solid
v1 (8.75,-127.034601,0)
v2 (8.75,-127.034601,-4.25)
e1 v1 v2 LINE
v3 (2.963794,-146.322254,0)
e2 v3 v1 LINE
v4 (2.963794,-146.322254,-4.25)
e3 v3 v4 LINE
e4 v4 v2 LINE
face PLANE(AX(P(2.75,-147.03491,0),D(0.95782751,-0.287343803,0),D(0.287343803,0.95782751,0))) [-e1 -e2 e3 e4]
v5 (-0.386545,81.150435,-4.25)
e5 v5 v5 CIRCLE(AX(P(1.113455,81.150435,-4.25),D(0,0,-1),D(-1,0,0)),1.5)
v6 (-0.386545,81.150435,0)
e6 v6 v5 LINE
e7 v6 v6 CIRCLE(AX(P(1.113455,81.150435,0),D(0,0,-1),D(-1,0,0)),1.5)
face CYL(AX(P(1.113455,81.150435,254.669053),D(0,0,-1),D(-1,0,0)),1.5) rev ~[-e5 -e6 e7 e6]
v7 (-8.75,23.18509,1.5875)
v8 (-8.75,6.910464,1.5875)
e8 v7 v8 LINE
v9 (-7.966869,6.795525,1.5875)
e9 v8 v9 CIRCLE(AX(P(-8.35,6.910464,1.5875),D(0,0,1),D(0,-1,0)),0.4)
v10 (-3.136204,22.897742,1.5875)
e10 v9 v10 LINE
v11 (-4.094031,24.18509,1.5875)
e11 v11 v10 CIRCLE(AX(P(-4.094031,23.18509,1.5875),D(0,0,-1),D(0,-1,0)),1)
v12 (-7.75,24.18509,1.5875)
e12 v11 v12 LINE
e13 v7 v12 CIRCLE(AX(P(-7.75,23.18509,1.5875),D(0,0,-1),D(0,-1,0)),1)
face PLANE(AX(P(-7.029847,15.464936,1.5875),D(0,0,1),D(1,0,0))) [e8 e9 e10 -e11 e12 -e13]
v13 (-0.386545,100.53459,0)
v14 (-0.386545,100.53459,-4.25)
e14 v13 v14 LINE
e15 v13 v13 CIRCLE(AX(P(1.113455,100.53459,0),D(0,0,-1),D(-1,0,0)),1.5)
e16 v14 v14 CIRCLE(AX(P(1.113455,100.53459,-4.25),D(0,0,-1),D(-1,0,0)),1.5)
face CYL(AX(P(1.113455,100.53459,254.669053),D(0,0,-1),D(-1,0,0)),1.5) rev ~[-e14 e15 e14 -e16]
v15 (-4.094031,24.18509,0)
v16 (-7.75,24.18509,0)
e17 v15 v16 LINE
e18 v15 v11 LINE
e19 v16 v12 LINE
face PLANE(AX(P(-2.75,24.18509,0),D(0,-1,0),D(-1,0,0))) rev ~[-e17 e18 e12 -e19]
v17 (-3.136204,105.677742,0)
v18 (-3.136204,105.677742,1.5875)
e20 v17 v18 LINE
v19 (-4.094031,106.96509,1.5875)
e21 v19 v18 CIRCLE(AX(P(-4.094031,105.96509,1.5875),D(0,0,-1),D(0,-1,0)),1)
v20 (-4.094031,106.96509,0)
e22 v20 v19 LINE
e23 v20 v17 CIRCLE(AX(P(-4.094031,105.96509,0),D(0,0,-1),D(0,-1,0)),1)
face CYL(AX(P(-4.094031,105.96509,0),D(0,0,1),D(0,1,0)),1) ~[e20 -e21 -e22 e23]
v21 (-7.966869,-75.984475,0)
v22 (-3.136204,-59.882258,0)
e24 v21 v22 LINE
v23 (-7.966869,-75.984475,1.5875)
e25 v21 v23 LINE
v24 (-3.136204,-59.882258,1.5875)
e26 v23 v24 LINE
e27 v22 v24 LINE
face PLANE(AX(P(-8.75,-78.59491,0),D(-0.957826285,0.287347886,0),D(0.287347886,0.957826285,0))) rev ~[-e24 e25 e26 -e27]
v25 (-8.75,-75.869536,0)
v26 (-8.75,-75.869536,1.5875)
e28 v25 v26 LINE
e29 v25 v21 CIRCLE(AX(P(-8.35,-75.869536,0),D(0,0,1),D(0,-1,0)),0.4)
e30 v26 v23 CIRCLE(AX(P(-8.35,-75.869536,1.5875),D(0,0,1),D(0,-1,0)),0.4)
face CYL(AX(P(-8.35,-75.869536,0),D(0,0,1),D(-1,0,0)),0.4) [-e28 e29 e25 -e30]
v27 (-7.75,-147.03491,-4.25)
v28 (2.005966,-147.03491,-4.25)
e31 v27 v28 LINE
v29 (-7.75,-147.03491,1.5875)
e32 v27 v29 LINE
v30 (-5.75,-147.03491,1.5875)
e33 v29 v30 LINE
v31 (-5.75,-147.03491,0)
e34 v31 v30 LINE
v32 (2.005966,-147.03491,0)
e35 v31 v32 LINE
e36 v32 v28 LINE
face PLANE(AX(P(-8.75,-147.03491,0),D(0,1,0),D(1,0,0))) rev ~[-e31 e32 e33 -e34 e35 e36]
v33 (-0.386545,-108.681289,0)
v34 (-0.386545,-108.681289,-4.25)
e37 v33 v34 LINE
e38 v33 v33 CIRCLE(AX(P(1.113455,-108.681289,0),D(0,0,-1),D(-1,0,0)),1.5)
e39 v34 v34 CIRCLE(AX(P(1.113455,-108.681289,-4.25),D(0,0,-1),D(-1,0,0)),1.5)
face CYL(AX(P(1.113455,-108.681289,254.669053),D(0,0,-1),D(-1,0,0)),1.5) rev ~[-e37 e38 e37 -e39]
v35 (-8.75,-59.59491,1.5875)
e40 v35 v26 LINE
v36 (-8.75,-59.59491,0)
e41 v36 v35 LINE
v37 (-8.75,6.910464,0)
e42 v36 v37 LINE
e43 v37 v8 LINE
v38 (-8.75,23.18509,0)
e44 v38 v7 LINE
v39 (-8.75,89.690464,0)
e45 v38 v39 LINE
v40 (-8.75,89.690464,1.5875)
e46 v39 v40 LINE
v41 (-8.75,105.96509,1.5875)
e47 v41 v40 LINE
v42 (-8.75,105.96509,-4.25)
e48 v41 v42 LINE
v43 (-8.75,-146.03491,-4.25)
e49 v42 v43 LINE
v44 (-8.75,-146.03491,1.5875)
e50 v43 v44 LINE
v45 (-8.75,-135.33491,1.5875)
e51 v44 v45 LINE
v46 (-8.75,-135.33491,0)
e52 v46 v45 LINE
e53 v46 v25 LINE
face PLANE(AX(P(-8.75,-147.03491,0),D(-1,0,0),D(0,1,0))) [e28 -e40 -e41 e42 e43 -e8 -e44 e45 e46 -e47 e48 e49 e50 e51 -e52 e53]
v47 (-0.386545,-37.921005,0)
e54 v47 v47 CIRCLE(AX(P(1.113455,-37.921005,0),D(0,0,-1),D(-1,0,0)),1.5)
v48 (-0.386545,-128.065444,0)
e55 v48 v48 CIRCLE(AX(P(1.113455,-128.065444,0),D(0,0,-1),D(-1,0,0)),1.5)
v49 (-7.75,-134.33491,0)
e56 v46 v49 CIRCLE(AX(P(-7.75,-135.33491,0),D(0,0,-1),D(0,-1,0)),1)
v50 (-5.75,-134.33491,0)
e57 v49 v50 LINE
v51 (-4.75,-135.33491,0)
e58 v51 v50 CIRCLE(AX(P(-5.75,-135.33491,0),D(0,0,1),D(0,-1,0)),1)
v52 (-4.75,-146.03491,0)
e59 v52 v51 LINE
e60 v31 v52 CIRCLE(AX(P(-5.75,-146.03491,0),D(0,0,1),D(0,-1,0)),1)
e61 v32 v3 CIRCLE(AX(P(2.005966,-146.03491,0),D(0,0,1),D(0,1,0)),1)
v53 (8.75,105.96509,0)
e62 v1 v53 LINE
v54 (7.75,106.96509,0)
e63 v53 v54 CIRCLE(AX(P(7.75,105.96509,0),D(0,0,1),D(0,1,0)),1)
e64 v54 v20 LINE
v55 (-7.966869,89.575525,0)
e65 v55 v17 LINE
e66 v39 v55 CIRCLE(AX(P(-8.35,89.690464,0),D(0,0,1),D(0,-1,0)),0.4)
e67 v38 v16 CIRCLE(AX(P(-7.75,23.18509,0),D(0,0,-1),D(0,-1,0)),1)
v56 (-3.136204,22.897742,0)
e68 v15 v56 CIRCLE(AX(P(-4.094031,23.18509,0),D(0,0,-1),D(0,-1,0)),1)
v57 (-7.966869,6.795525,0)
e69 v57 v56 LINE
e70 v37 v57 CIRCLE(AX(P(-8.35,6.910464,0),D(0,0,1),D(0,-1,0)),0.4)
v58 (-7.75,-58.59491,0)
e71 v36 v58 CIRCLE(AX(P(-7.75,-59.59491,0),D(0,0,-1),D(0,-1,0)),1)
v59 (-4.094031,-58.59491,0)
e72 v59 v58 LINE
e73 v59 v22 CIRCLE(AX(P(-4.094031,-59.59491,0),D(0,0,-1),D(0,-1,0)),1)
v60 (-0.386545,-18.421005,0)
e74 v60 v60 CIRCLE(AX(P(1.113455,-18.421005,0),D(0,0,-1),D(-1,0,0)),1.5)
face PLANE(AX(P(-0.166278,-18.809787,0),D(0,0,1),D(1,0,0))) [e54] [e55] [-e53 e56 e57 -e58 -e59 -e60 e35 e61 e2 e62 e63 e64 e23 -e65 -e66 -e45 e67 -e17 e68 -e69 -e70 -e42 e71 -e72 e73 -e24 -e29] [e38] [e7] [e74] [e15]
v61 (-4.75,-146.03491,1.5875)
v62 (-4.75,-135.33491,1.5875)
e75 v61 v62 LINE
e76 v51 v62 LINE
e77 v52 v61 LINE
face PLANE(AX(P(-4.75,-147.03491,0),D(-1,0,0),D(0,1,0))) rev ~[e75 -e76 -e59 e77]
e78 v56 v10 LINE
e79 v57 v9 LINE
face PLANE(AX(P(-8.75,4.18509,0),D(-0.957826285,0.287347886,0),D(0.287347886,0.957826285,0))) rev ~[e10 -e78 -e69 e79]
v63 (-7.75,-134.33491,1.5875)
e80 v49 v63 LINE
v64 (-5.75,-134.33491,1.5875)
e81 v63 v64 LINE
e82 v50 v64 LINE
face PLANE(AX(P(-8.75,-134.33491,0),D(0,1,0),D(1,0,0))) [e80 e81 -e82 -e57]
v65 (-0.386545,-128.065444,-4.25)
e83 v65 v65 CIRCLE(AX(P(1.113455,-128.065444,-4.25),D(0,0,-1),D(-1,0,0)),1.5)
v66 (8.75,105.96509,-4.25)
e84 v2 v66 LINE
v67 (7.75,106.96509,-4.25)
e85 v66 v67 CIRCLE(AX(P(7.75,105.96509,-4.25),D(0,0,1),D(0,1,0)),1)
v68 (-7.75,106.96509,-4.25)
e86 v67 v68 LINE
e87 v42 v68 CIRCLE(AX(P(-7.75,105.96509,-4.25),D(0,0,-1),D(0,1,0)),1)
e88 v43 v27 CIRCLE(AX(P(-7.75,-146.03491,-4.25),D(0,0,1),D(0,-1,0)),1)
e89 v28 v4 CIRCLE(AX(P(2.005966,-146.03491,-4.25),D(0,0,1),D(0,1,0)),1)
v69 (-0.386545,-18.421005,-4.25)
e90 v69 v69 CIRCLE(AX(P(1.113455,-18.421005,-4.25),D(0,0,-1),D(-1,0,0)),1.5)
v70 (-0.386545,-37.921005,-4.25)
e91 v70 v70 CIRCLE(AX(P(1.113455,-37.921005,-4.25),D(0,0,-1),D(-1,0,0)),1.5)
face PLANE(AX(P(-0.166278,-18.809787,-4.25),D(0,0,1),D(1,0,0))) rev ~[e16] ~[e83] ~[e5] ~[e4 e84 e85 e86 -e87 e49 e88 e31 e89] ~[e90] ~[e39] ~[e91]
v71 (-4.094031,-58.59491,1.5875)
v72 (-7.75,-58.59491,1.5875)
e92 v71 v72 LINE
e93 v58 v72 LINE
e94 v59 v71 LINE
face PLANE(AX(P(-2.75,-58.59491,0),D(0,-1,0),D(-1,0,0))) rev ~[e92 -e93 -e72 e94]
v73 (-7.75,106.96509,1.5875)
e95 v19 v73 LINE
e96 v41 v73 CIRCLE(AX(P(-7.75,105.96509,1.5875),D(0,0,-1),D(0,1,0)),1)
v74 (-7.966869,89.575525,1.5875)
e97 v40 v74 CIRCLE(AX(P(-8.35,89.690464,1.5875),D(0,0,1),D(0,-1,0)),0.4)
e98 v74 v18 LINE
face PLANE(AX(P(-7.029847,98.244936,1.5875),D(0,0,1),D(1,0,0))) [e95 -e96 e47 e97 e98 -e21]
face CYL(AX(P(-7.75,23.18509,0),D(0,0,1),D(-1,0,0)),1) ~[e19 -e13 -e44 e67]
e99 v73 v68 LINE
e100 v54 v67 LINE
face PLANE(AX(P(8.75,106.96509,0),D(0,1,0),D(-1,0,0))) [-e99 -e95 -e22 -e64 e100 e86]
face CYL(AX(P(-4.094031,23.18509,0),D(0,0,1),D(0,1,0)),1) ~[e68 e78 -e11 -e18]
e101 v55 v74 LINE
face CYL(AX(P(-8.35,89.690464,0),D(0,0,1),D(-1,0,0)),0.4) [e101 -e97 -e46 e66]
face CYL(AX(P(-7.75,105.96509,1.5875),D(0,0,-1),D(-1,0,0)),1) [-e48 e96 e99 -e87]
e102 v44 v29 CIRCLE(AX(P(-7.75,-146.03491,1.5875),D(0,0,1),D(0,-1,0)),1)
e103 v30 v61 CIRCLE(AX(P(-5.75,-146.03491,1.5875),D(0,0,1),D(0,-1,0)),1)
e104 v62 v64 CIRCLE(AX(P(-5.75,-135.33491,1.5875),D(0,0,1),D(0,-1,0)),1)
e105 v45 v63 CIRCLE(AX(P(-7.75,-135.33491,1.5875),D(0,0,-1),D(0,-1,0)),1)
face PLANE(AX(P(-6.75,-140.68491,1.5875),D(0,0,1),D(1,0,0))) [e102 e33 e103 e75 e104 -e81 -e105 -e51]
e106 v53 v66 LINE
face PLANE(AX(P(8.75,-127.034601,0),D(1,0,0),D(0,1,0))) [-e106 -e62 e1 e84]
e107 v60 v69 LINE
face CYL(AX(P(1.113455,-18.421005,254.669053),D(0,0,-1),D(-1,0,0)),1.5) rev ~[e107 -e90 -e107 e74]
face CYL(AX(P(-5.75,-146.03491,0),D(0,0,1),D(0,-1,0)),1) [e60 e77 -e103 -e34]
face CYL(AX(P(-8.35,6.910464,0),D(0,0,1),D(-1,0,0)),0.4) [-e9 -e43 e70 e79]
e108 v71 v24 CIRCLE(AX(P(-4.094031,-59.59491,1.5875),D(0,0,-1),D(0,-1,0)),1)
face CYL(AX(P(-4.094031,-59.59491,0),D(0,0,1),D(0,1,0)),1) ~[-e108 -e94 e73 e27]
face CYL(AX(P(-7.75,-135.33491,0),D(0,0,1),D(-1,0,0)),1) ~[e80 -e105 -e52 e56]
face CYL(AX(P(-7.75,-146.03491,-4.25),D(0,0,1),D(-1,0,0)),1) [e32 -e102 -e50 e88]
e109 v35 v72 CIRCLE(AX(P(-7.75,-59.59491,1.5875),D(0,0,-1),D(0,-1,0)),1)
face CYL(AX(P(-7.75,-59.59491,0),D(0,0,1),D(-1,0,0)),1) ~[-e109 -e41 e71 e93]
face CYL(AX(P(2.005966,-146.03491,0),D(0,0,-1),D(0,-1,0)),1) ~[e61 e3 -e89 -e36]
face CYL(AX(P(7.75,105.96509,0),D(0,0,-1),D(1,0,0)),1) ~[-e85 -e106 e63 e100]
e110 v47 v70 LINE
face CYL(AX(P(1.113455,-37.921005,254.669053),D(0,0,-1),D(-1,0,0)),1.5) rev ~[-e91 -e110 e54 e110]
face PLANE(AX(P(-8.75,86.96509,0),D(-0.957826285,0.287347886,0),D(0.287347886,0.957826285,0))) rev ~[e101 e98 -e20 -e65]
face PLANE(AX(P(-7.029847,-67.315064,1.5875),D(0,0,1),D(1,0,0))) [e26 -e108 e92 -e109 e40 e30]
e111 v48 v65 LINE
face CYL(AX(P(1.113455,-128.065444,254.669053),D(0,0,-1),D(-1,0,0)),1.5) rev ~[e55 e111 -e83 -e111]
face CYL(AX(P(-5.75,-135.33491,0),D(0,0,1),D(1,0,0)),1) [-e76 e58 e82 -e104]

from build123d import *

# Parameters (mm, degrees)
F1_DEPTH = 4.25
F2_W     = 4
F2_H     = 12.7
F3_DEPTH = 1.5875
F4_R     = 1
F5_F1_R  = 0.4
F5_F2_R  = 0.4
F5_F3_R  = 0.4
F7_D     = 3


with BuildPart() as f1:
    # F0 (on Top) → F1 (new body)
    with BuildSketch(Plane.XY):
        Polygon((8.75, 106.9650896668), (-8.75, 106.9650896668), (-8.75, -147.0349103332), (2.75, -147.0349103332), (8.75, -127.0346005735), align=None)
    extrude(amount=-F1_DEPTH)

    # F2 (on face) → F3 (join)
    with BuildSketch(Plane.XY):
        Polygon((-2.75, 24.1850896668), (-8.75, 24.1850896668), (-8.75, 4.1850896668), align=None)
        Polygon((-2.75, -58.5949103332), (-8.75, -58.5949103332), (-8.75, -78.5949103332), align=None)
        with Locations((-6.75, -140.6849103332)):
            Rectangle(F2_W, F2_H)
        Polygon((-2.75, 106.9650896668), (-8.75, 106.9650896668), (-8.75, 86.9650896668), align=None)
    extrude(amount=F3_DEPTH)

    # F4
    f4_edges = [f1.edges().sort_by_distance(p)[0] for p in [
        (-2.75, -58.59491, 0.79375),
        (-8.75, -58.59491, 0.79375),
        (-2.75, 24.18509, 0.79375),
        (-8.75, 24.18509, 0.79375),
        (-2.75, 106.96509, 0.79375),
        (-8.75, 106.96509, -1.33125),
        (8.75, 106.96509, -2.125),
        (-8.75, -147.03491, -1.33125),
        (-4.75, -147.03491, 0.79375),
        (-4.75, -134.33491, 0.79375),
        (-8.75, -134.33491, 0.79375),
        (2.75, -147.03491, -2.125),
    ]]
    fillet(f4_edges, radius=F4_R)

    # F5: fillet of radius 0.4 on 3 edges, made by hand

    # F5_f1
    f5_f1_edges = [f1.edges().sort_by_distance(p)[0] for p in [
        (-8.75, 86.9650896668, 0.79375),
    ]]
    fillet(f5_f1_edges, radius=F5_F1_R)

    # F5_f2
    f5_f2_edges = [f1.edges().sort_by_distance(p)[0] for p in [
        (-8.75, -78.5949103332, 0.79375),
    ]]
    fillet(f5_f2_edges, radius=F5_F2_R)

    # F5_f3
    f5_f3_edges = [f1.edges().sort_by_distance(p)[0] for p in [
        (-8.75, 4.1850896668, 0.79375),
    ]]
    fillet(f5_f3_edges, radius=F5_F3_R)

    # F7 (through all)
    with Locations(Plane.XY):
        with Locations((1.113455, 100.5345896668), (1.113455, 81.1504351225), (1.113455, -18.4210048775), (1.113455, -37.9210048775), (1.113455, -108.6812892063), (1.113455, -128.0654437506)):
            Hole(F7_D / 2)


solid = f1.part
